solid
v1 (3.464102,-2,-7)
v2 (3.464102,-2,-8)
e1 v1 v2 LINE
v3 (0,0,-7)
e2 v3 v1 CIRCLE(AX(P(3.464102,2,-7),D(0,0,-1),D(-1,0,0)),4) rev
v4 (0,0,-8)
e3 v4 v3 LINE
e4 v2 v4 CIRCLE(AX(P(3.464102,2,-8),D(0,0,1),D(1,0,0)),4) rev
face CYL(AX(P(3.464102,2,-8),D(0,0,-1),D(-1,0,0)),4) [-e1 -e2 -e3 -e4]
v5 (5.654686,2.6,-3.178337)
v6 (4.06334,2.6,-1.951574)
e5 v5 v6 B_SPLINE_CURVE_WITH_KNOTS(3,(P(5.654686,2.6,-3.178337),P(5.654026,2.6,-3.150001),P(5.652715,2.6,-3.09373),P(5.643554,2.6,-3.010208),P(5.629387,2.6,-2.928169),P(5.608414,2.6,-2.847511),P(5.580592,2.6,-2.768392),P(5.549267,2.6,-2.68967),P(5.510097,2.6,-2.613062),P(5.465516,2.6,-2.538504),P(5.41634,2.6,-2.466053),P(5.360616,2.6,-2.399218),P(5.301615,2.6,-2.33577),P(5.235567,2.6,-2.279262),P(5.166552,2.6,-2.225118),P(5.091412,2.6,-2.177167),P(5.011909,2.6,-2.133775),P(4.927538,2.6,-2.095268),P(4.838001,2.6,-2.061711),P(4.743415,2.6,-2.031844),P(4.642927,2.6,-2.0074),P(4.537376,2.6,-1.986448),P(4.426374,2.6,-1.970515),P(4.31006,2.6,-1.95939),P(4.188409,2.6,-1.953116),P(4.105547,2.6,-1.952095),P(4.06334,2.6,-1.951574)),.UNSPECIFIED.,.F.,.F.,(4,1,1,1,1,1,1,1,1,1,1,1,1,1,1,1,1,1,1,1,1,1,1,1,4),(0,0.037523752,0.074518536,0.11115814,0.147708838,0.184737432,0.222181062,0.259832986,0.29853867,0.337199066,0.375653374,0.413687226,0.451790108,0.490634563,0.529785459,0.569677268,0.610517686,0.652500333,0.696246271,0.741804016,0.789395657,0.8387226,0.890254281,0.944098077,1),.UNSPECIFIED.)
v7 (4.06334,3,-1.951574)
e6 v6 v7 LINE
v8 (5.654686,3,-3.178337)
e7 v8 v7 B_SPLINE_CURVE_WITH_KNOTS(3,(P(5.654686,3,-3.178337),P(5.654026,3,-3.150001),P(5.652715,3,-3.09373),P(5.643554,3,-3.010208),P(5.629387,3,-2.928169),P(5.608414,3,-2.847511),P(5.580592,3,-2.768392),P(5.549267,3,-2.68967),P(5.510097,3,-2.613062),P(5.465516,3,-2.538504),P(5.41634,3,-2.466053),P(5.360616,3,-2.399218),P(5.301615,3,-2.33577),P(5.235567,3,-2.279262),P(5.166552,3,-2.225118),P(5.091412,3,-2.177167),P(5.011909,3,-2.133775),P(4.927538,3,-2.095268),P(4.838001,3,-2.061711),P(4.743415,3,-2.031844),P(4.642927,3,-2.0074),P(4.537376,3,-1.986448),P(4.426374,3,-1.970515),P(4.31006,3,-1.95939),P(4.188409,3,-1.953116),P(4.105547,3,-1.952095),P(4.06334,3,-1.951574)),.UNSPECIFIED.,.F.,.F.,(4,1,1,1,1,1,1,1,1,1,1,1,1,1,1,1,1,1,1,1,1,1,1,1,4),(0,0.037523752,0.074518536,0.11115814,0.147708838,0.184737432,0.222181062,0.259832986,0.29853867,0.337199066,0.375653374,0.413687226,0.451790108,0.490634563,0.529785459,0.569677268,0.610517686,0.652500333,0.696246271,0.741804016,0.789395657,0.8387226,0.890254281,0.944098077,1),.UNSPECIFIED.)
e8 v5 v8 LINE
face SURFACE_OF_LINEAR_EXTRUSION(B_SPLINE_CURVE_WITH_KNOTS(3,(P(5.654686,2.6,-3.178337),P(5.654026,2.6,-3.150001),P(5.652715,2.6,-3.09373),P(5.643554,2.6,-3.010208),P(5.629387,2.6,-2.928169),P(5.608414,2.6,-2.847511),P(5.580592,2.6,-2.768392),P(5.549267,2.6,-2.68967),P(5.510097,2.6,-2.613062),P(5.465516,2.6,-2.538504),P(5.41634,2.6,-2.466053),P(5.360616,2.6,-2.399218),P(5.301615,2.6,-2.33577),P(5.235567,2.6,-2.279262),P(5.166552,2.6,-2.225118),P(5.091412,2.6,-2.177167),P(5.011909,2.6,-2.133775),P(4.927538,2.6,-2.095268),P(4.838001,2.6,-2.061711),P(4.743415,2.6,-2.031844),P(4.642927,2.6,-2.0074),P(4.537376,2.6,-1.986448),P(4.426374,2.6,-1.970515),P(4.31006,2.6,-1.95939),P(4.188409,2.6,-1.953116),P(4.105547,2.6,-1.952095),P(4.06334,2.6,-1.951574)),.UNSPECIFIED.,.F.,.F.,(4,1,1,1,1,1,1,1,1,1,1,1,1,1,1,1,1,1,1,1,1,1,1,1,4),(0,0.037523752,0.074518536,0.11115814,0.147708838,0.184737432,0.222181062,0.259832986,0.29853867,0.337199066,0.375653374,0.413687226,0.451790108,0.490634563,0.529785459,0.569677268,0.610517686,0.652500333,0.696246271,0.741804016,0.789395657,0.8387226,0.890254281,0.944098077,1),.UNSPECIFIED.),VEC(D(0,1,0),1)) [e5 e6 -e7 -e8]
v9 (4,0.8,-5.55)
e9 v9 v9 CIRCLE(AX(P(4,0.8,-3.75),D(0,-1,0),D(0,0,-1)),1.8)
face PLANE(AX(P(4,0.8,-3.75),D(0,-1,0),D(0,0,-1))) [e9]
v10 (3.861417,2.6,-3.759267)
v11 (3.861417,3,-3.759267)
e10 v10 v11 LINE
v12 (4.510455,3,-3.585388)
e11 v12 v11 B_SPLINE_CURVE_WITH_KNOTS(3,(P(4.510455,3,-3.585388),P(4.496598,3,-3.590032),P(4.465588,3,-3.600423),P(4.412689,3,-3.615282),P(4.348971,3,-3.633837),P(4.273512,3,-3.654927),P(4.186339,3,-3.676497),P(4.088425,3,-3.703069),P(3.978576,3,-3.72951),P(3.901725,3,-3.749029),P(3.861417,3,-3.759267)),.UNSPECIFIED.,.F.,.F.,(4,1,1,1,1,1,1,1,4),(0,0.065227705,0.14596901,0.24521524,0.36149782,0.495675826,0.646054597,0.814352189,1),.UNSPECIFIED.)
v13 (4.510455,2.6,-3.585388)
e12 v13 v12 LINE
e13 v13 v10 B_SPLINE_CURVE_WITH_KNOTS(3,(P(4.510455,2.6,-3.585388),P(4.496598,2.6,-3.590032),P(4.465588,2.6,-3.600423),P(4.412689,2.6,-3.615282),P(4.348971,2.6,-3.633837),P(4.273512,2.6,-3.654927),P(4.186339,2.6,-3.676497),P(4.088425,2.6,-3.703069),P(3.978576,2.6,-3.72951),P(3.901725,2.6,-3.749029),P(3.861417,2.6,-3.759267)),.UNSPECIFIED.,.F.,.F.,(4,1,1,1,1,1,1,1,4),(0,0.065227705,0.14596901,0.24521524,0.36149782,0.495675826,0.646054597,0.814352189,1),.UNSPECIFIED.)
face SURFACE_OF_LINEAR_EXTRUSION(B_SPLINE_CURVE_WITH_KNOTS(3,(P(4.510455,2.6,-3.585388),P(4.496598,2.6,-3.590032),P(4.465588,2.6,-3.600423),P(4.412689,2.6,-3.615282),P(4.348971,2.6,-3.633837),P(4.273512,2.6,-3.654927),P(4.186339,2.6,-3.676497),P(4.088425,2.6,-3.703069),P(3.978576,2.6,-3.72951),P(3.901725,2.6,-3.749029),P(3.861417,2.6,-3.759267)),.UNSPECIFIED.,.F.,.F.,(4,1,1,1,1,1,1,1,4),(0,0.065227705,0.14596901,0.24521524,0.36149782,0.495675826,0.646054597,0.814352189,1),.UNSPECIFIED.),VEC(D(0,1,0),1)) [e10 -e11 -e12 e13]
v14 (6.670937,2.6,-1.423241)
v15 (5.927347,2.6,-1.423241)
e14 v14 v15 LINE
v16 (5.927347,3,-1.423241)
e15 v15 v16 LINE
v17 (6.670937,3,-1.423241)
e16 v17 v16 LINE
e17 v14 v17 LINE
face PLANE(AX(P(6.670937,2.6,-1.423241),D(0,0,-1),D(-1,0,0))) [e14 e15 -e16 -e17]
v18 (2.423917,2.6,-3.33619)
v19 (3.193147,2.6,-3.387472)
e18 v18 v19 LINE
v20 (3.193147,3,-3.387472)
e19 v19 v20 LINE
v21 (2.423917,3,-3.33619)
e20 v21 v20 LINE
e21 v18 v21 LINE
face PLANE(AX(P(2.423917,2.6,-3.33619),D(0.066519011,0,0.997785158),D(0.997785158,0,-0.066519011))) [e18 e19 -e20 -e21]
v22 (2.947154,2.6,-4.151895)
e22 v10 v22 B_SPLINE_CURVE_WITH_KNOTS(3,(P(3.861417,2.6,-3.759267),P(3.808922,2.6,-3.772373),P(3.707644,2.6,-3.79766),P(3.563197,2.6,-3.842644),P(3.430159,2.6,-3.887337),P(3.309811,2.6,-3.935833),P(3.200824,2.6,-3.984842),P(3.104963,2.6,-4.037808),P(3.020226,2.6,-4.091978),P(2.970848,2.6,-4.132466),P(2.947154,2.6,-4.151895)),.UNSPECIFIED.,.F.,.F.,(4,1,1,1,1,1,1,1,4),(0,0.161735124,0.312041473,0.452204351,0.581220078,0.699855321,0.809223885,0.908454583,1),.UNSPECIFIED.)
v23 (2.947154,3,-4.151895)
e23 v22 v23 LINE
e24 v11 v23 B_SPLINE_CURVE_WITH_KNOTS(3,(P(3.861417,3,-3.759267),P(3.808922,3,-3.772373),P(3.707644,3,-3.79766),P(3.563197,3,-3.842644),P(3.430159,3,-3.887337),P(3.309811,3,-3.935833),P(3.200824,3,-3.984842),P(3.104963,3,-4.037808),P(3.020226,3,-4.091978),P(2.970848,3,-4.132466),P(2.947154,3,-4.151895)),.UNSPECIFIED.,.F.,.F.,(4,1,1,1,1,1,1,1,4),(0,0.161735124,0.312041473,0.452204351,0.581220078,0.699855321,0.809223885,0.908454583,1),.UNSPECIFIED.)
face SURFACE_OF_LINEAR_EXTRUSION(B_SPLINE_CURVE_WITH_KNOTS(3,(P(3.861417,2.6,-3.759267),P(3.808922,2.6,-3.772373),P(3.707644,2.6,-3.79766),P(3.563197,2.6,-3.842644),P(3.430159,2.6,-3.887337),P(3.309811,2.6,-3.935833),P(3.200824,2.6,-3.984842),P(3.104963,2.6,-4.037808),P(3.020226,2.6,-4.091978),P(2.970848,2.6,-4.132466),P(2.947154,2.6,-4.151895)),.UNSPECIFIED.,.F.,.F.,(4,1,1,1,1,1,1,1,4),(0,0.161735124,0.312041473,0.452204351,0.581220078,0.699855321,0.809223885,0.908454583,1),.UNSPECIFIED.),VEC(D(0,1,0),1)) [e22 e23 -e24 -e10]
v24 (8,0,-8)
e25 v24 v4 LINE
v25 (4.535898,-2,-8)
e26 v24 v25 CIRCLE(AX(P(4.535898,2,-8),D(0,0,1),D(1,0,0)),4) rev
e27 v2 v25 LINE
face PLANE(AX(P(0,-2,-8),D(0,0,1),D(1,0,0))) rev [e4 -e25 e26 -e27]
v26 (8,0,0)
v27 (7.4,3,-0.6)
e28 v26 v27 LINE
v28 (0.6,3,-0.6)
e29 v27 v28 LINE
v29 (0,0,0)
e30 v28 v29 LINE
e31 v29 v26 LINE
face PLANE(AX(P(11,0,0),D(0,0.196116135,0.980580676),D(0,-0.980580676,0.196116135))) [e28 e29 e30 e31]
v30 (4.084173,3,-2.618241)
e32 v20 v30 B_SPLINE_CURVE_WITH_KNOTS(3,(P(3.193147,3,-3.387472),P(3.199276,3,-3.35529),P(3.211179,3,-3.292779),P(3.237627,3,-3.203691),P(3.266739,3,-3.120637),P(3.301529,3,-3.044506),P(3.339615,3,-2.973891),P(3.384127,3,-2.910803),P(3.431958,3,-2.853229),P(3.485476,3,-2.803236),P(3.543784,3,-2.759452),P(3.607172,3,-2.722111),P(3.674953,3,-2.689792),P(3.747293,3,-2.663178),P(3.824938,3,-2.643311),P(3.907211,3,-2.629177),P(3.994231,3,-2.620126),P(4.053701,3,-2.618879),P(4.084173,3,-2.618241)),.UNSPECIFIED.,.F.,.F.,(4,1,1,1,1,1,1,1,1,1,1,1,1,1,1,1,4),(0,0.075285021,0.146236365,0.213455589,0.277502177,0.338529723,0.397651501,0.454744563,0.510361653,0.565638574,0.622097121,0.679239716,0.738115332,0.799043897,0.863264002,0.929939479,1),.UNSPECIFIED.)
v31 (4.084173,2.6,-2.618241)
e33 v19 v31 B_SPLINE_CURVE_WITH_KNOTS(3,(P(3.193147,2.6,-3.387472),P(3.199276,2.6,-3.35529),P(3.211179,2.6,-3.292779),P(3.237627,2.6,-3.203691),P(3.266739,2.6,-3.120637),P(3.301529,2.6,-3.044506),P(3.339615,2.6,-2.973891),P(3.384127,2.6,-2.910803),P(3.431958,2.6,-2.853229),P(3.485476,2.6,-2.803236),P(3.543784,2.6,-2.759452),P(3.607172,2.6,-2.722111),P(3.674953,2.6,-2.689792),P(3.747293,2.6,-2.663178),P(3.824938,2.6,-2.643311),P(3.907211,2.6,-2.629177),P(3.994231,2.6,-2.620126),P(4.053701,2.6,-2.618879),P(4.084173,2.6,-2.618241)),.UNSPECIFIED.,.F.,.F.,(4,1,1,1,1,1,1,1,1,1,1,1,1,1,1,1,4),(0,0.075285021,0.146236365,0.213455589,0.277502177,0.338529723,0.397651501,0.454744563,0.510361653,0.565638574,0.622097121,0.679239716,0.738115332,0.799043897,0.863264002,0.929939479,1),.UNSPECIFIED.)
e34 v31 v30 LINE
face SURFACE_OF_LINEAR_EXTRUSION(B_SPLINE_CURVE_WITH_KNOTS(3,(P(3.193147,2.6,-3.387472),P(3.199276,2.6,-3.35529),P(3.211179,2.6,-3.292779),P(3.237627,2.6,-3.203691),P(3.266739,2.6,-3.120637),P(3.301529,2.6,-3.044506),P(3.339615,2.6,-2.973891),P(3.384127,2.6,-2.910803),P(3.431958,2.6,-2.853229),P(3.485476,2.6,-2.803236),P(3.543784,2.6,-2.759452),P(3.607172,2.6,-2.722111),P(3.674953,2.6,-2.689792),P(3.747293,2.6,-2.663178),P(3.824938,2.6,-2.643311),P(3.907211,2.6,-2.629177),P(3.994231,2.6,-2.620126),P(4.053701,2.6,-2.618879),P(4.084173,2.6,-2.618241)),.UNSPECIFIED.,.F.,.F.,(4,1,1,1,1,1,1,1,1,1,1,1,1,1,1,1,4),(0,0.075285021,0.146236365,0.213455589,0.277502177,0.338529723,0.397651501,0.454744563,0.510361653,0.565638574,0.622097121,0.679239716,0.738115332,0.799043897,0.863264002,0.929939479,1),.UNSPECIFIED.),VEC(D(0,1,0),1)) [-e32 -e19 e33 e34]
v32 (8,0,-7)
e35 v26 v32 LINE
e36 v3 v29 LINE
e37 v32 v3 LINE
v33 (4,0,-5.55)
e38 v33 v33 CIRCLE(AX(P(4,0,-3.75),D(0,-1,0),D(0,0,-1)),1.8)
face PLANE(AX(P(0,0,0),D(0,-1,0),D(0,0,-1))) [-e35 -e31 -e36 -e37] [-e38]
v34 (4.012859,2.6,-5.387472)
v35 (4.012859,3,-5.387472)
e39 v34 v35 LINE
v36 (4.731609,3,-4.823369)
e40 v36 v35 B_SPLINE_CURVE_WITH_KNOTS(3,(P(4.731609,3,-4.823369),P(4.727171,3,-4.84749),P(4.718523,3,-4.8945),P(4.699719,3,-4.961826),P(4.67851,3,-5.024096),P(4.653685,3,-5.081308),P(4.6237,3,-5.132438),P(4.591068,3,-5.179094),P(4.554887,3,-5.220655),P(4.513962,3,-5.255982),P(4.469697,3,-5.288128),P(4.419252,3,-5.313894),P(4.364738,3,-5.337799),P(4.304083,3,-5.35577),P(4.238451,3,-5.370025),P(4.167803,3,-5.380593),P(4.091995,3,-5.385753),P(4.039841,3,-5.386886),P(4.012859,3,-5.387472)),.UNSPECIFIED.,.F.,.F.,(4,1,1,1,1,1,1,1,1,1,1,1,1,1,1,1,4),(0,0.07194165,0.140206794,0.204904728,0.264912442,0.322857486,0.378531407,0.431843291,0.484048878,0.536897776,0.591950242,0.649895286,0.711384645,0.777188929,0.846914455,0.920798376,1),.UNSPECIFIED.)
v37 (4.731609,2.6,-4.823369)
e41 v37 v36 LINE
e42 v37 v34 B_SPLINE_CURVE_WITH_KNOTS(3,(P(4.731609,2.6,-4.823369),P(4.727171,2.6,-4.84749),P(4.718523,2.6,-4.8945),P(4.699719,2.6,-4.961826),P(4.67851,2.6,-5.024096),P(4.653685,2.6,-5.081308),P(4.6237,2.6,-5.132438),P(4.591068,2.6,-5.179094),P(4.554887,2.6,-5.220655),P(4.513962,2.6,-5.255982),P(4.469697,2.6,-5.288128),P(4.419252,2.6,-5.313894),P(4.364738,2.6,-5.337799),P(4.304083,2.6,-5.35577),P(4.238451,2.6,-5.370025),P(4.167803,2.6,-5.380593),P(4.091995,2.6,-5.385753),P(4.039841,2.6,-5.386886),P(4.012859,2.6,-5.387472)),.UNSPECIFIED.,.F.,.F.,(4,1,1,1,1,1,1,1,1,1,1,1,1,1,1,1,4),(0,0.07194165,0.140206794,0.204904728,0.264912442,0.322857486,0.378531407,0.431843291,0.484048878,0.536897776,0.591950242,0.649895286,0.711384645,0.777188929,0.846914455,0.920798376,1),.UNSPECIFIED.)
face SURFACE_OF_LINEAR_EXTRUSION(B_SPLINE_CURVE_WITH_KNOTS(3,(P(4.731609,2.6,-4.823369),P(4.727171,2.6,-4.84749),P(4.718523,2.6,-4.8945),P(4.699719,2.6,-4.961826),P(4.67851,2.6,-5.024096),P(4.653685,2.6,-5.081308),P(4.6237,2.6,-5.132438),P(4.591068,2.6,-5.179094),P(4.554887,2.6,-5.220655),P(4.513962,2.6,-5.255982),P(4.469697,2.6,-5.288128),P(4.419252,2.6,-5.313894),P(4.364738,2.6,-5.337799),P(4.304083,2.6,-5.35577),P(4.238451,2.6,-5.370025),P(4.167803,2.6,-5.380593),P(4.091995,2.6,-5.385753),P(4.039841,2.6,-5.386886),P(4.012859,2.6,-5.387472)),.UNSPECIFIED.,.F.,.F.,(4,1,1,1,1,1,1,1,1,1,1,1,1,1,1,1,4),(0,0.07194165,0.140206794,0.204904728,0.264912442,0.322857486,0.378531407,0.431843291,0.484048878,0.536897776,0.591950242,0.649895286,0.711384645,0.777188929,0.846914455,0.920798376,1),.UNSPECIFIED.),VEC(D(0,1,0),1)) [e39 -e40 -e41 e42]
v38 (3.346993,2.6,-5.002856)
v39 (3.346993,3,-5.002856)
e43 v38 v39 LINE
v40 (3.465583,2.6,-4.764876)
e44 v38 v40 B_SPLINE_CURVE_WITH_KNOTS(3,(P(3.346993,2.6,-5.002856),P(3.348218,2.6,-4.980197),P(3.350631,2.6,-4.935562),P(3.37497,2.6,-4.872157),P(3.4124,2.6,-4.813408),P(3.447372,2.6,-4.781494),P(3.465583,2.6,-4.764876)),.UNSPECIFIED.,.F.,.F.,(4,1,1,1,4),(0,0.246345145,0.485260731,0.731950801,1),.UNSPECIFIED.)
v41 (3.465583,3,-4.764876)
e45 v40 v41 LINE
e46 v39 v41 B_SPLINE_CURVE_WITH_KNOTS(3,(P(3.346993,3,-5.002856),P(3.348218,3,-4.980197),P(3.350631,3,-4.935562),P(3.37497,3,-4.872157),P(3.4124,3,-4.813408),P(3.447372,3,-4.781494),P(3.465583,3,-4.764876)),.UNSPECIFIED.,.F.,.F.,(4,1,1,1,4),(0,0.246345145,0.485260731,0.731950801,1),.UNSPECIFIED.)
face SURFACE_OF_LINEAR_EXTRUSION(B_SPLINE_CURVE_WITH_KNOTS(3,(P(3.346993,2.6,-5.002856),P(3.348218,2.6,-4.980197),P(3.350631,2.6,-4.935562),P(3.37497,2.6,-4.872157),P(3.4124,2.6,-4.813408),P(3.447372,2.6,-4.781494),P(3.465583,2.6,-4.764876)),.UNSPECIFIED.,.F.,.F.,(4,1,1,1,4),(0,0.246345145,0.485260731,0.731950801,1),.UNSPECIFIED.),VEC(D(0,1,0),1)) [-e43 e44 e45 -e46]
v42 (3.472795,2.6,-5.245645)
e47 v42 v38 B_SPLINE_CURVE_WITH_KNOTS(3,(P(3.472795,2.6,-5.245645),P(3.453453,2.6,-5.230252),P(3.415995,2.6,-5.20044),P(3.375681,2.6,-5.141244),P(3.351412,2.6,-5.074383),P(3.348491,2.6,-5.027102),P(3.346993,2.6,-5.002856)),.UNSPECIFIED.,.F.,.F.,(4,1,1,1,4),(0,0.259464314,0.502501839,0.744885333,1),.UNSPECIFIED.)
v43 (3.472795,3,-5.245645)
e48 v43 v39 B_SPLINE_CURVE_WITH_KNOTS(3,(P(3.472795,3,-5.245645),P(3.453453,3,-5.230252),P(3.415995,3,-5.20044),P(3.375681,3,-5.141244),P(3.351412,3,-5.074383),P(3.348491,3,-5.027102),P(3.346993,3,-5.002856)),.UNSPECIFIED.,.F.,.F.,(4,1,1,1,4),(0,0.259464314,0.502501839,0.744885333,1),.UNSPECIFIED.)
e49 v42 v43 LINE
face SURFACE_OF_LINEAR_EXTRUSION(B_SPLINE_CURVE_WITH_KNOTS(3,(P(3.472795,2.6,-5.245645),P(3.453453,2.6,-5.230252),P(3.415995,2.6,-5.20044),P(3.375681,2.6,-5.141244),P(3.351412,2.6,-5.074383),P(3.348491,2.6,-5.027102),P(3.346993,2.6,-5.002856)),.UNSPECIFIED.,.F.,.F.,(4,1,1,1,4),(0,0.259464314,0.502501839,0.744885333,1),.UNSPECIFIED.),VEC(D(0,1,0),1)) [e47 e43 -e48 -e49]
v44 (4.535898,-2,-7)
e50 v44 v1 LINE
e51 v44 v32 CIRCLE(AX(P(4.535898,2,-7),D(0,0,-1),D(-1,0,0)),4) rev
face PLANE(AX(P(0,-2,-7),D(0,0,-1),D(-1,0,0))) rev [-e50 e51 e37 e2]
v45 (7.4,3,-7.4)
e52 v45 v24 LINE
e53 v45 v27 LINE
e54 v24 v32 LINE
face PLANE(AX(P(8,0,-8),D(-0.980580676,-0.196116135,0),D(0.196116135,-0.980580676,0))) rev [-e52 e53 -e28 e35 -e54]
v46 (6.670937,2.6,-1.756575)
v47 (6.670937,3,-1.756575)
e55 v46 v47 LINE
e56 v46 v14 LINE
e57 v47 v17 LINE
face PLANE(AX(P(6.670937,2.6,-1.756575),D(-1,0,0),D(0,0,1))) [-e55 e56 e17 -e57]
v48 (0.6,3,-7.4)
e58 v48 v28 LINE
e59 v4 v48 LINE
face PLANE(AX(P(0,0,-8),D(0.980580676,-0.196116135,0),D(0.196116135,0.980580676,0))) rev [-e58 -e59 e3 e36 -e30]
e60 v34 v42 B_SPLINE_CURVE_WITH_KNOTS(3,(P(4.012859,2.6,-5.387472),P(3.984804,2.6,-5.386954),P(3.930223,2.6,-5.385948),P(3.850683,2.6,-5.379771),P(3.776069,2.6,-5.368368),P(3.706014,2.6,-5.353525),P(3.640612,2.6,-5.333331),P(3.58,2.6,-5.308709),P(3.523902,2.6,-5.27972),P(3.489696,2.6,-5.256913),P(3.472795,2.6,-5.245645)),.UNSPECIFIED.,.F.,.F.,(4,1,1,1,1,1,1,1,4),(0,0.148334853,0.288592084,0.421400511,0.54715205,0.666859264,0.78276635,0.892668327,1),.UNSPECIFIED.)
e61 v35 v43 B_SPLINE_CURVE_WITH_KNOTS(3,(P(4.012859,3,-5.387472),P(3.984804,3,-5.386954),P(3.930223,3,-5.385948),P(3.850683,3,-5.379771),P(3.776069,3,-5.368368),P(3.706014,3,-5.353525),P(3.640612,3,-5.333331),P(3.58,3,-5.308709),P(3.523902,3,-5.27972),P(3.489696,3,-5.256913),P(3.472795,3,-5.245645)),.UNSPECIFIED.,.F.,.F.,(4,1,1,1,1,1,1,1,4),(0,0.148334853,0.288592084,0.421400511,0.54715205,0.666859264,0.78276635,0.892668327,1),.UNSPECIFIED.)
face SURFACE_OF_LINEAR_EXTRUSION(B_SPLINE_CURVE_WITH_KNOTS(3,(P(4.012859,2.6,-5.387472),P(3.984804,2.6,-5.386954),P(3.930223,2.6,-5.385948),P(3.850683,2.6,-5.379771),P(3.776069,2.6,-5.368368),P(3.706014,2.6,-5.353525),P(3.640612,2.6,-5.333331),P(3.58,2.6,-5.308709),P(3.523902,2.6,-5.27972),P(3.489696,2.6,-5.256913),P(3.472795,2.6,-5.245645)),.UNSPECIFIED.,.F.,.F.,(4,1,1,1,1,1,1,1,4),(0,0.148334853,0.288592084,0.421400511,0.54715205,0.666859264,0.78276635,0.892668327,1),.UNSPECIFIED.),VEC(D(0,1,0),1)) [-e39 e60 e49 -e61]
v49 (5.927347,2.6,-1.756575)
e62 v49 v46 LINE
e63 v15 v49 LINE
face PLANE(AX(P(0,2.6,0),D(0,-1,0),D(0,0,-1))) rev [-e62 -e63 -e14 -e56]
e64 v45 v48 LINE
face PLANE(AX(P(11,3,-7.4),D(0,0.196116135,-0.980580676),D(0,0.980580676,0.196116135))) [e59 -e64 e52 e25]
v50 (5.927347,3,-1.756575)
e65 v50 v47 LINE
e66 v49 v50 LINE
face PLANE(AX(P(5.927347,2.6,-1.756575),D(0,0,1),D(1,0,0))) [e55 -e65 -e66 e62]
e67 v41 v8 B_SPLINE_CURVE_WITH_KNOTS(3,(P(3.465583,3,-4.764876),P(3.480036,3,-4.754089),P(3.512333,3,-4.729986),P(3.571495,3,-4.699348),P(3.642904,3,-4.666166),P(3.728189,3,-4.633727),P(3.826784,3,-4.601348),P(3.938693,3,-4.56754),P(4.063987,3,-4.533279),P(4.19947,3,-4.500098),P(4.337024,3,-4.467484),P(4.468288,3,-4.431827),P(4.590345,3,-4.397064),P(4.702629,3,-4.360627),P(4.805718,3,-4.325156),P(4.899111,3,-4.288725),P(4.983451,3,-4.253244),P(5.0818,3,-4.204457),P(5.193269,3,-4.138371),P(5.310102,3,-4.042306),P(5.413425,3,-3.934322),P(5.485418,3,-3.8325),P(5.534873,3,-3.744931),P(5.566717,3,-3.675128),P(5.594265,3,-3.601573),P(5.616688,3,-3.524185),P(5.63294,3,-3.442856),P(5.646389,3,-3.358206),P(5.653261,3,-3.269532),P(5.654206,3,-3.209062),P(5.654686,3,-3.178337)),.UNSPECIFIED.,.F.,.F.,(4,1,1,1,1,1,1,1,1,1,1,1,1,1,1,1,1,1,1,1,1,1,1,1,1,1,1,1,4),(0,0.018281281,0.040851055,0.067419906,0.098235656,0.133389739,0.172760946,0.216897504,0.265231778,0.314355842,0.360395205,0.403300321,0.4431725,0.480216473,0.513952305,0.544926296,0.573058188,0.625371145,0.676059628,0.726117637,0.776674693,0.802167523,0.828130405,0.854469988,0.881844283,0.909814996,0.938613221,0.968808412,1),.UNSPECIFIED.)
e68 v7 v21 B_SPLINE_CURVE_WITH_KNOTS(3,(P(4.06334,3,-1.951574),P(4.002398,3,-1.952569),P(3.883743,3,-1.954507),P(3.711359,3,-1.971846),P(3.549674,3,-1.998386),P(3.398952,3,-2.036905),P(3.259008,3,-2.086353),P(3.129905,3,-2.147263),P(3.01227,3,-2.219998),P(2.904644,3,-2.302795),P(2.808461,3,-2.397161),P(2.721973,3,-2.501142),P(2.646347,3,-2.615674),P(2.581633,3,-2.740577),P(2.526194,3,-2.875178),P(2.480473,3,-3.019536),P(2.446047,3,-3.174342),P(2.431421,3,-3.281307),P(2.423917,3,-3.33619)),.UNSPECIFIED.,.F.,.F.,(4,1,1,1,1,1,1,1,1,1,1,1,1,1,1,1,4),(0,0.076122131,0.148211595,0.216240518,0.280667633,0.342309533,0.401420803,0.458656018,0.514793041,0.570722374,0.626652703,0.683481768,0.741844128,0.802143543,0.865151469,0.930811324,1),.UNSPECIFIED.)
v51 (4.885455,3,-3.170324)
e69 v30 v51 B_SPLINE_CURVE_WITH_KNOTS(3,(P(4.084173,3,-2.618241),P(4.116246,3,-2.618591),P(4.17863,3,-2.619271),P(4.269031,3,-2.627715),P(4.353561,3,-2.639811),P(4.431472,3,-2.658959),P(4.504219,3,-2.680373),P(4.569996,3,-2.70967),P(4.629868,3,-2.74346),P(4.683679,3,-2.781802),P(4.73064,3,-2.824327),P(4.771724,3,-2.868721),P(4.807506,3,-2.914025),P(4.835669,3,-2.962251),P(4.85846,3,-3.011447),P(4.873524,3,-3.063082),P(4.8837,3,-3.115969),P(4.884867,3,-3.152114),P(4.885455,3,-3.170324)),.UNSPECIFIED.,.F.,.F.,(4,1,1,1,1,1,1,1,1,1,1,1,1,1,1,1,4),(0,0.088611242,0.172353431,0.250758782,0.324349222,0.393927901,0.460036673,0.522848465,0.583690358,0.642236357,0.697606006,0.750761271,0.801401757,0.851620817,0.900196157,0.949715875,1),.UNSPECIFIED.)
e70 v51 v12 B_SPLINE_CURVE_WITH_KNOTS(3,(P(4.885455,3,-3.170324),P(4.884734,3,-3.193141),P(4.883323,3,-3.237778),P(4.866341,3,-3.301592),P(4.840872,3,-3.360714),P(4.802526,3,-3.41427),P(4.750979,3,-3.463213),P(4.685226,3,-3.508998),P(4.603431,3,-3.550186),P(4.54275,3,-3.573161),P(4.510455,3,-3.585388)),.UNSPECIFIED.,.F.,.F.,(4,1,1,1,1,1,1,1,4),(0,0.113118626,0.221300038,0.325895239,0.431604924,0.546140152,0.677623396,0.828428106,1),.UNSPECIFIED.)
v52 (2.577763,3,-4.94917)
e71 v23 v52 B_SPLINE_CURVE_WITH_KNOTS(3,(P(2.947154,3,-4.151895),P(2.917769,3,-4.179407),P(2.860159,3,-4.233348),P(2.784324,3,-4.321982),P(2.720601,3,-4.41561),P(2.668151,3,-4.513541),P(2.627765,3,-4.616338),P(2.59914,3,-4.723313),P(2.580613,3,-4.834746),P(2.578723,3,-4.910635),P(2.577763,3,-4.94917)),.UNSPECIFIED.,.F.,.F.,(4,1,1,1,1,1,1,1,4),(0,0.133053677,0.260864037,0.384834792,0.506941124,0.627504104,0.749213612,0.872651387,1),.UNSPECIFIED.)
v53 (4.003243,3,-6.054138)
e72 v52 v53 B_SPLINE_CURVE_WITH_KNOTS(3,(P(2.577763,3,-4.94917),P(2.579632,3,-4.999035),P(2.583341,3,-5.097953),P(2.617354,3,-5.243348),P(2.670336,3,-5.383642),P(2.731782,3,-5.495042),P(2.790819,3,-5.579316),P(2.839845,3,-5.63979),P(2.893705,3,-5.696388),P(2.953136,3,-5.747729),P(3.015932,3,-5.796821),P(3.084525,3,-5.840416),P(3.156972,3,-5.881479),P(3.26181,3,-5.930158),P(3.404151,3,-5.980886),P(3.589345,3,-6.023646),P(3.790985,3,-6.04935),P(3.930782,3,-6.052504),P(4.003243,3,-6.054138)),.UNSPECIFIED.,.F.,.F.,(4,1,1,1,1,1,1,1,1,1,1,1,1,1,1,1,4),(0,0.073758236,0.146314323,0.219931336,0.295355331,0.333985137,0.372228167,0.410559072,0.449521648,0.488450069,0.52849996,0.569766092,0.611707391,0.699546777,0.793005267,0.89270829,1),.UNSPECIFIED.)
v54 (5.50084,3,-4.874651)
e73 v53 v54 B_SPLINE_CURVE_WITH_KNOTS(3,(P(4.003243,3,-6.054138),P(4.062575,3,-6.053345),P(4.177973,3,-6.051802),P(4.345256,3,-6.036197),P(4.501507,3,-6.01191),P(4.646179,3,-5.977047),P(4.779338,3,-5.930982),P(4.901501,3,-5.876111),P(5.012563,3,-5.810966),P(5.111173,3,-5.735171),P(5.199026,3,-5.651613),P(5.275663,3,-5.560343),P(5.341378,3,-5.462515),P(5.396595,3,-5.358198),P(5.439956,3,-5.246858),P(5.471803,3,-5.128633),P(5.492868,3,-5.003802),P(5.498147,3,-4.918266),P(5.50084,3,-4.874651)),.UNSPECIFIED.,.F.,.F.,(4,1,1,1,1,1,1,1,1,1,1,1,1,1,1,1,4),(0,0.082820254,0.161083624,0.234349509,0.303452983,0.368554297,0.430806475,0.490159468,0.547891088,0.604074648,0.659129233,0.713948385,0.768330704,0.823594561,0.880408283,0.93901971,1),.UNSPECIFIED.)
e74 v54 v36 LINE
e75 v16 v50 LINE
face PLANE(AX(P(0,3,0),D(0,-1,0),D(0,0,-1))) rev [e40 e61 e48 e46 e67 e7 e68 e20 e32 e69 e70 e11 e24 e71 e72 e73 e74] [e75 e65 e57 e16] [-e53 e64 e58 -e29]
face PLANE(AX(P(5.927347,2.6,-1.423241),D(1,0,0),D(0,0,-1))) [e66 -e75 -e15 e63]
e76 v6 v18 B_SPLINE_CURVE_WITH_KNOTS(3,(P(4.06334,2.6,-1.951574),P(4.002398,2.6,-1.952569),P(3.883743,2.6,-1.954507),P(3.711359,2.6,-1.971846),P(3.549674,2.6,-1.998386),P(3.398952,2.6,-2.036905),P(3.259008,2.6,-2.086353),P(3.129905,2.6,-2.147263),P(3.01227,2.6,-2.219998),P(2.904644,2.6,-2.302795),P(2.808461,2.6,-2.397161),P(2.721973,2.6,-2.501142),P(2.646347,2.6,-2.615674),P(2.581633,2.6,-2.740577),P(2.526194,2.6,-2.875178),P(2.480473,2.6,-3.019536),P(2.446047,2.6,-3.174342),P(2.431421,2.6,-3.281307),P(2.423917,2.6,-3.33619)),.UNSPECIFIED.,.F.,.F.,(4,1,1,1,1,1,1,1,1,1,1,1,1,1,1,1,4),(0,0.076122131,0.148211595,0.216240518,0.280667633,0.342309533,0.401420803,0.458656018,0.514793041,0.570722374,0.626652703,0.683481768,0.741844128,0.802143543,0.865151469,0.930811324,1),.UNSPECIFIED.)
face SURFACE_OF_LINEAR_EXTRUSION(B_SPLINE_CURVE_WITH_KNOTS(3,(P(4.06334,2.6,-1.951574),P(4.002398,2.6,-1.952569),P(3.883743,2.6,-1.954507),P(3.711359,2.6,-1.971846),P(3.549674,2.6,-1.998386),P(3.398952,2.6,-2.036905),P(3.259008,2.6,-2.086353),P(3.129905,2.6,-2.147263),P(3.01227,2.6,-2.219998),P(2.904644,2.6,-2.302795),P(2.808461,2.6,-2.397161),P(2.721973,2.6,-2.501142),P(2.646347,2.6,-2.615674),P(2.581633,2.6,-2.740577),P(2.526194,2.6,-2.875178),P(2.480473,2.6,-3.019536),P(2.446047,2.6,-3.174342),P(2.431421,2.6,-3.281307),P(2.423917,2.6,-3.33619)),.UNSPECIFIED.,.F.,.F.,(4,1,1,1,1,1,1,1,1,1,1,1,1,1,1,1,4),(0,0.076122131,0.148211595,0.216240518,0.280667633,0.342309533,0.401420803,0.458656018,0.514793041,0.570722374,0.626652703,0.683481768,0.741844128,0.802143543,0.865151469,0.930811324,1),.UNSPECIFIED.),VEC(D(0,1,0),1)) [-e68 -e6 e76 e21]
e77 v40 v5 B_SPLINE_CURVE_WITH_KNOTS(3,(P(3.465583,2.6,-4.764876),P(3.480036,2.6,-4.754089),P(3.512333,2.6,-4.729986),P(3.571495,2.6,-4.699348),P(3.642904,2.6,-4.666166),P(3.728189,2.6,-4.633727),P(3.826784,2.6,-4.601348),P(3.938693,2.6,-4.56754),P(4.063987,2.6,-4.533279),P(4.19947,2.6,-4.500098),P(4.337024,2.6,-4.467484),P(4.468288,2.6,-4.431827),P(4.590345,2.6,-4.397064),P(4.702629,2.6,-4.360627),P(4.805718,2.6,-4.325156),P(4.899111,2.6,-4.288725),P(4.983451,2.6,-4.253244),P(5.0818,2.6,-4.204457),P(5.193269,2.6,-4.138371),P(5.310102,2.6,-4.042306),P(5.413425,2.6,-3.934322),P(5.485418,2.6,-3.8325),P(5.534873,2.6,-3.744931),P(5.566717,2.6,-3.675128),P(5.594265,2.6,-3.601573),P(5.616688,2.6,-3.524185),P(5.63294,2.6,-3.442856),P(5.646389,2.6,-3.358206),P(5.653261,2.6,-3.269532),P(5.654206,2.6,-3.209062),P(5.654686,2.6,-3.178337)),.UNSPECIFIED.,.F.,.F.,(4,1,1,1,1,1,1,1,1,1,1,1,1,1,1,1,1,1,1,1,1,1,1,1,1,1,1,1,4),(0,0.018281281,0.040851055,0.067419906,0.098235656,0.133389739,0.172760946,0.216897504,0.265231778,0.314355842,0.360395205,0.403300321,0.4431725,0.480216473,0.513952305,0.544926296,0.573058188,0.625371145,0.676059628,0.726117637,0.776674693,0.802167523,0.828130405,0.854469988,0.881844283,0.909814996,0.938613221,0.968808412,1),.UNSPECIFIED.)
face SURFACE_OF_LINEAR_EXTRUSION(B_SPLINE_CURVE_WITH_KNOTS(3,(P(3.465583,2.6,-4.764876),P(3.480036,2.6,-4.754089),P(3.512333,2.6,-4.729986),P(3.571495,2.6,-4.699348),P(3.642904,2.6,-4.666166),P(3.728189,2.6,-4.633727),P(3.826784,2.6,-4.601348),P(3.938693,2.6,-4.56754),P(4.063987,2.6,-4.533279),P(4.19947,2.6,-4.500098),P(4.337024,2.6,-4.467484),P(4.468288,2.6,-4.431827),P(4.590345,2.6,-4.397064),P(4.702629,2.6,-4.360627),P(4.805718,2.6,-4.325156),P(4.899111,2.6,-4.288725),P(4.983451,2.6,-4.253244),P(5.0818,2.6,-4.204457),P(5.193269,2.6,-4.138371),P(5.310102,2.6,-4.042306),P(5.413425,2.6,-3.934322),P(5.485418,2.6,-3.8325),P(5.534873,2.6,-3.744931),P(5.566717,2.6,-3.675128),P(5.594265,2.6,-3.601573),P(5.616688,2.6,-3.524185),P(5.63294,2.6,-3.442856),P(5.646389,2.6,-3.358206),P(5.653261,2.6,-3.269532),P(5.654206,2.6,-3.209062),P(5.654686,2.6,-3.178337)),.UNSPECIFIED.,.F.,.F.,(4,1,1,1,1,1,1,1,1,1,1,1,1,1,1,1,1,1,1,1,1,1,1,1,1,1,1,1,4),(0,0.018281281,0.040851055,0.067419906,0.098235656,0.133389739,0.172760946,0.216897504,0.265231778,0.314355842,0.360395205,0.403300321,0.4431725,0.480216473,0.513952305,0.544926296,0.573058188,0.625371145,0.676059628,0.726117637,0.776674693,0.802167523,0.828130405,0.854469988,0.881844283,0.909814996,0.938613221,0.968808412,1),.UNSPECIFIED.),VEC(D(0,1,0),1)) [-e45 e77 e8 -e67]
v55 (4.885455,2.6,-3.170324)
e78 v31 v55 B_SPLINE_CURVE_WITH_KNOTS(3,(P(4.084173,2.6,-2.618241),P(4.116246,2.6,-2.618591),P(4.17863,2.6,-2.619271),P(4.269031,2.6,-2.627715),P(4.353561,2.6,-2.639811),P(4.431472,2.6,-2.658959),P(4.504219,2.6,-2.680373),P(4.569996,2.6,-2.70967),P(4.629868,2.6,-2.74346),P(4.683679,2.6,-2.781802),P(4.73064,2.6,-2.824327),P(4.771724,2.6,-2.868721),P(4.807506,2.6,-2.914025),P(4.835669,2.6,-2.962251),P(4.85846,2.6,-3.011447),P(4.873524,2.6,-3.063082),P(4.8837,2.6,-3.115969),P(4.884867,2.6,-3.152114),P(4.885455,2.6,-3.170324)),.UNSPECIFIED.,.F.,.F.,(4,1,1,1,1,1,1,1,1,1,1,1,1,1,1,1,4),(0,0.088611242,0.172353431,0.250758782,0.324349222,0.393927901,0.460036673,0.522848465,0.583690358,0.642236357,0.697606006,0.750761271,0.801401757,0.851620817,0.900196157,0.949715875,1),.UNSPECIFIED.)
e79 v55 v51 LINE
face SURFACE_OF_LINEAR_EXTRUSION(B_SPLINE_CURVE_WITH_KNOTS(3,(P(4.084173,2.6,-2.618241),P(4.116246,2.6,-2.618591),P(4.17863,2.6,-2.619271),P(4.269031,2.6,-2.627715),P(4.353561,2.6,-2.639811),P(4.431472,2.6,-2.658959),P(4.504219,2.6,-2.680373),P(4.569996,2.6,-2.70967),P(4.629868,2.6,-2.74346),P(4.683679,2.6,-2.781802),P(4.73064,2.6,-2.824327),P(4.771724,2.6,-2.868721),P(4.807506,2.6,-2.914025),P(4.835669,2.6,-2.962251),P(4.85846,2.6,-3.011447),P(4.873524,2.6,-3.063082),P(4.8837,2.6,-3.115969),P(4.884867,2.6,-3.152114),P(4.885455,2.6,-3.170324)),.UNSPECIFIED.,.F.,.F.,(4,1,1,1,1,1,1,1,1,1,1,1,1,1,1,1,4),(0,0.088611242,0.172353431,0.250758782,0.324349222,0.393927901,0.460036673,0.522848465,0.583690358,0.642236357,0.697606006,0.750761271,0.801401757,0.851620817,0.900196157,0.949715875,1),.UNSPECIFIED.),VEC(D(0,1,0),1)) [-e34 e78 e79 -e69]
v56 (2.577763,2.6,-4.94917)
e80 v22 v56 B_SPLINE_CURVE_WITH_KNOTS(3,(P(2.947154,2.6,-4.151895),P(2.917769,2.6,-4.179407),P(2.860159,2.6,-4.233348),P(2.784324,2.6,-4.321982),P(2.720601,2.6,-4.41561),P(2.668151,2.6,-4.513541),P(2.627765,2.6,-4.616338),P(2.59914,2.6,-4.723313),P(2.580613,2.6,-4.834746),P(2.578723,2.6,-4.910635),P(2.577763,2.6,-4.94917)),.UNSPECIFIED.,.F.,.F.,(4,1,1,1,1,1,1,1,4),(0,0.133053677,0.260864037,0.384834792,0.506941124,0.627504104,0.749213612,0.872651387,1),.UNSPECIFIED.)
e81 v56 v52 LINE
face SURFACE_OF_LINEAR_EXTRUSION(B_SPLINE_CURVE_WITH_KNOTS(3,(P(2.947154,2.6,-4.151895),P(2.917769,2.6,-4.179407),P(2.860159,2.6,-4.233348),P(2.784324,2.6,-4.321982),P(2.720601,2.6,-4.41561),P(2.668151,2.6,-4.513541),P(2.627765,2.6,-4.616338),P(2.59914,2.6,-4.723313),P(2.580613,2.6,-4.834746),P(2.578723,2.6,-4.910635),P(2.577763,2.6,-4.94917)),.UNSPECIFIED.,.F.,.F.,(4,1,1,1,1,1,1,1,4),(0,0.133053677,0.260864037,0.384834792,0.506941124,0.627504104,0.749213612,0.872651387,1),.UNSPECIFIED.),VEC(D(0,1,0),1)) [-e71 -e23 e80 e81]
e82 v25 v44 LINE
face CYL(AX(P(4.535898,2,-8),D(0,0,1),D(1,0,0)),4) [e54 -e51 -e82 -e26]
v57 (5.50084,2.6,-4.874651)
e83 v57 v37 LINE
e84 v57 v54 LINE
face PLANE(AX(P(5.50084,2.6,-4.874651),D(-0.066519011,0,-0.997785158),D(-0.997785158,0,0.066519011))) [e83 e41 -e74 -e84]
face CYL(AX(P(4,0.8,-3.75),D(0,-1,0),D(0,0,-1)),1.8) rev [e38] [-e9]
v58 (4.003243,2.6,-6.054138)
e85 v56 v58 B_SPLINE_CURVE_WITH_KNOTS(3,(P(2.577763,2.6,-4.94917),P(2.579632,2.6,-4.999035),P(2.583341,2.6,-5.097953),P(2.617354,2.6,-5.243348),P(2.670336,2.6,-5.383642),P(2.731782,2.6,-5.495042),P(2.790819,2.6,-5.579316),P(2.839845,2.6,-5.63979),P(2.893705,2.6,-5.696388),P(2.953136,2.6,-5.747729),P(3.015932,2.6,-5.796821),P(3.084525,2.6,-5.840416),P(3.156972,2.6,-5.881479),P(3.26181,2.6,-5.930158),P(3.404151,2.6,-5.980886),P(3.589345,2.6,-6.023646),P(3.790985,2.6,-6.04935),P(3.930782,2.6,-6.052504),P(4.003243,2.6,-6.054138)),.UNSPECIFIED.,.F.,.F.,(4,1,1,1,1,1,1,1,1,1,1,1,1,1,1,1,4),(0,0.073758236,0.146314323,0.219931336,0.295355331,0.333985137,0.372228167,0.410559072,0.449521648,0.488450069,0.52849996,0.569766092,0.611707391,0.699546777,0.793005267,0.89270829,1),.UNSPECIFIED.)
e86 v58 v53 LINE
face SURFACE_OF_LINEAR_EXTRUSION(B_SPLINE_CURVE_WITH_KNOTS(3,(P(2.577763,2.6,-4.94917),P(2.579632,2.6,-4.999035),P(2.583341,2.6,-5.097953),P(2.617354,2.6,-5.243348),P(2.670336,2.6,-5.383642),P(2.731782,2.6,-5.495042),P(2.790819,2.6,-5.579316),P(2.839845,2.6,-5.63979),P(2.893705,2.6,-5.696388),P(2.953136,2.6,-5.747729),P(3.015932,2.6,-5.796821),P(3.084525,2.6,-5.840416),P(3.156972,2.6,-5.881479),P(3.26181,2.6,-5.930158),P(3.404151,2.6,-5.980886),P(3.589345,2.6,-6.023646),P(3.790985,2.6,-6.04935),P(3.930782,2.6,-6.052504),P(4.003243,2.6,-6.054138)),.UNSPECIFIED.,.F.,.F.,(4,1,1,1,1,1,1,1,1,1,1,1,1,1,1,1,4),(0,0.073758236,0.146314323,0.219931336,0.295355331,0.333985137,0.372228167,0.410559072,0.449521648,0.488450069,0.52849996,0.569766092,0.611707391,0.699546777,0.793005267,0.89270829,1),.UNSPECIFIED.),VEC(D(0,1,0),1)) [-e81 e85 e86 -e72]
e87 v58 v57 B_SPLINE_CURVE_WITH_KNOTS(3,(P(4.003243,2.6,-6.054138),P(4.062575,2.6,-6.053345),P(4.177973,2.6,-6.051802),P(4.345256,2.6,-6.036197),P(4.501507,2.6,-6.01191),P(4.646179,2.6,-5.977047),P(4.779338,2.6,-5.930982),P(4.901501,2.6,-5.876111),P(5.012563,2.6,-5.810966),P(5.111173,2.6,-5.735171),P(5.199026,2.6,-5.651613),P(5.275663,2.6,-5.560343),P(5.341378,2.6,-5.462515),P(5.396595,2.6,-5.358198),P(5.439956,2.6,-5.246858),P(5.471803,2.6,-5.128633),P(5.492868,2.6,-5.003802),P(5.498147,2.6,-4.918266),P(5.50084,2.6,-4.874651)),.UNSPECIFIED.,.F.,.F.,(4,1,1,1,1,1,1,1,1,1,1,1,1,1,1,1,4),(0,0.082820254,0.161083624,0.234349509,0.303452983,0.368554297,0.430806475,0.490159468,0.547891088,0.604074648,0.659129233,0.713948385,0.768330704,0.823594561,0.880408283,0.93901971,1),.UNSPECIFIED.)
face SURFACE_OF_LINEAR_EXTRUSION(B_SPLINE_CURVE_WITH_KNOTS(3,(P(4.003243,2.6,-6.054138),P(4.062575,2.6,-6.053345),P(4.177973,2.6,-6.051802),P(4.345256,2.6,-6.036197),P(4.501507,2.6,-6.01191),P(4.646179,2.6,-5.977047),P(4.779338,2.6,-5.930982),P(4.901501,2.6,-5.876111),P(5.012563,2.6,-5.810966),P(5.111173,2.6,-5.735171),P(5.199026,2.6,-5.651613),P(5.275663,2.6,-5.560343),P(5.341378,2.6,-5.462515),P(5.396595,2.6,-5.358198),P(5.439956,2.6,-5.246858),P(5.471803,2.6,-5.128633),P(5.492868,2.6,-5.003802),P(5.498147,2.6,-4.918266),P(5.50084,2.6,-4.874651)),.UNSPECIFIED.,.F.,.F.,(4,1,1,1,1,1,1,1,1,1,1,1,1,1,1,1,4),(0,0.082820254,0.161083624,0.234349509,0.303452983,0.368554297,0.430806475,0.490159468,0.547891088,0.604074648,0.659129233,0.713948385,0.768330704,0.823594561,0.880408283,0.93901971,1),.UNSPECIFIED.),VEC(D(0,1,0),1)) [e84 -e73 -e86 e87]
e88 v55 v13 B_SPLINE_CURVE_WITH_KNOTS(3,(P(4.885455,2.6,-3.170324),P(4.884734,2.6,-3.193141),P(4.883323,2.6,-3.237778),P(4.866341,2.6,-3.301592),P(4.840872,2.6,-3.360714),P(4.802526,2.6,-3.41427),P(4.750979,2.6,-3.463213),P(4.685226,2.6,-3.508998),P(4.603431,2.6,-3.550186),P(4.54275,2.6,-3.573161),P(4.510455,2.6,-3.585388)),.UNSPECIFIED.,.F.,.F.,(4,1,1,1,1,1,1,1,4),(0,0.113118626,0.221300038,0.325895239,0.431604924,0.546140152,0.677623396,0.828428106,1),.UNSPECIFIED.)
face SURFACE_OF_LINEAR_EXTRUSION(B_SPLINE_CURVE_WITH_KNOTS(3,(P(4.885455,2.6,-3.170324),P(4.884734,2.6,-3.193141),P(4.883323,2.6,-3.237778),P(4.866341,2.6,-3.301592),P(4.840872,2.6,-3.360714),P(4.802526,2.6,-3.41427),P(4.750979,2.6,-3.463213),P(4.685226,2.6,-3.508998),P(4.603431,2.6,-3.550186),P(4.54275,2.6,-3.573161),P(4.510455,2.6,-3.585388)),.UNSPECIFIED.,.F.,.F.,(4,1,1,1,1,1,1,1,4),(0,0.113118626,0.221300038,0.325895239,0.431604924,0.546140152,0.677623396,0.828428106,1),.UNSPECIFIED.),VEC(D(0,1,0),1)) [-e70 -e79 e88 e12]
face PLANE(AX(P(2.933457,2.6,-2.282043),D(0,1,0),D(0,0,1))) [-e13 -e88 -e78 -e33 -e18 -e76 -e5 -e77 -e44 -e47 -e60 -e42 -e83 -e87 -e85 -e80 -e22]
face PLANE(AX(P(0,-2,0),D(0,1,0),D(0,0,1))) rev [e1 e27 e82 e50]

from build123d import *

# Parameters (mm, degrees)
SKETCH1_W               = 8
SKETCH1_H               = 8
BOSS_EXTRUDE1_DEPTH     = 3
CUT_EXTRUDE1_DEPTH      = 12.704699911
CUT_EXTRUDE1_DEPTH_BACK = 12.704699911
CUT_EXTRUDE2_DEPTH      = 11
SKETCH4_R               = 1.8
CUT_EXTRUDE3_DEPTH      = 0.8
SKETCH5_W               = 8
SKETCH5_H               = 1
BOSS_EXTRUDE2_DEPTH     = 2
FILLET1_R               = 4
CUT_EXTRUDE4_DEPTH      = 0.4
SKETCH7_W               = 0.743589743
SKETCH7_H               = 0.333333333
CUT_EXTRUDE5_DEPTH      = 0.4


with BuildPart() as part:
    # Sketch1 → Boss-Extrude1 (new body)
    with BuildSketch(Plane(origin=(0, 0, 0), x_dir=(1, 0, 0), z_dir=(0, 1, 0))):
        with Locations((4, 4)):
            Rectangle(SKETCH1_W, SKETCH1_H)
    extrude(amount=BOSS_EXTRUDE1_DEPTH)

    # Sketch2 → Cut-Extrude1 (cut, two sides: drawn at the far end of the back side and taken through both)
    with BuildSketch(Plane.XY.offset(-CUT_EXTRUDE1_DEPTH_BACK)):
        Polygon((0, 0), (0.6, 3), (0, 3), align=None)
        Polygon((8, 0), (7.4, 3), (8, 3), align=None)
    extrude(amount=CUT_EXTRUDE1_DEPTH + CUT_EXTRUDE1_DEPTH_BACK, mode=Mode.SUBTRACT)

    # Sketch3 → Cut-Extrude2 (cut)
    with BuildSketch(Plane(origin=(0, 0, 0), x_dir=(0, 0, -1), z_dir=(1, 0, 0))):
        Polygon((0, 0), (0.6, 3), (0, 3), align=None)
        Polygon((8, 3), (7.4, 3), (8, 0), align=None)
    extrude(amount=CUT_EXTRUDE2_DEPTH, mode=Mode.SUBTRACT)

    # Sketch4 → Cut-Extrude3 (cut)
    with BuildSketch(Plane.XZ):
        with Locations(Location((4, -3.75, 0), (0, 0, 270))):
            Circle(SKETCH4_R)
    extrude(amount=-CUT_EXTRUDE3_DEPTH, mode=Mode.SUBTRACT)

    # Sketch5 → Boss-Extrude2 (add)
    with BuildSketch(Plane.XZ):
        with Locations((4, -7.5)):
            Rectangle(SKETCH5_W, SKETCH5_H)
    extrude(amount=BOSS_EXTRUDE2_DEPTH)

    # Fillet1
    # the kernel refuses this fillet: 4 mm, written as the material it takes off along each edge
    with BuildSketch(Plane(origin=(8, -2, -16.660254038), x_dir=(0, 1, 0), z_dir=(0, 0, 1)), Plane(origin=(0, -2, 1.660254038), x_dir=(0, 1, 0), z_dir=(0, 0, -1))) as fillet1_piece_1:
        with BuildLine():
            CenterArc((4, 3.464101615), FILLET1_R, 180, 60)
            Line((0, 3.464101615), (-0.08, 3.464101615))
            Line((-0.08, 3.464101615), (-0.08, 0))
            Line((-0.08, 0), (0, -0.08))
            ThreePointArc((0, -0.08), (1, -0.08), (1.96, -0.069282032))
            Line((1.96, -0.069282032), (2, 0))
        make_face()
    extrude(amount=18.320508076, mode=Mode.SUBTRACT)

    # Sketch6 → Cut-Extrude4 (cut)
    with BuildSketch(Plane(origin=(0, 3, 0), x_dir=(1, 0, 0), z_dir=(0, 1, 0))):
        with BuildLine():
            Line((2.423916505, 3.336189685), (3.193147274, 3.387471736))
            add(Edge.make_bspline(
                [(3.193147274, 3.387471736), (3.199275518, 3.35528983), (3.211179242, 3.292778523), (3.237627081, 3.203691377), (3.266738832, 3.12063689), (3.30152897, 3.044505684), (3.339615284, 2.973890515), (3.38412658, 2.910803039), (3.431957638, 2.853229033), (3.485476185, 2.803236311), (3.543783948, 2.759451994), (3.607171876, 2.722111271), (3.674953108, 2.6897922), (3.747293374, 2.663178469), (3.824938253, 2.64331119), (3.907211345, 2.629176798), (3.994230643, 2.620125524), (4.053701404, 2.618879435), (4.084172915, 2.618240967)],
                knots=[0, 0, 0, 0, 1.204560339, 2.339781841, 3.415289417, 4.440034832, 5.416475564, 6.362424008, 7.275913008, 8.16578645, 9.05021719, 9.95355393, 10.867835453, 11.809845306, 12.784702352, 13.812224031, 14.87903166, 16, 16, 16, 16], degree=3))
            add(Edge.make_bspline(
                [(4.084172915, 2.618240967), (4.116246108, 2.618590883), (4.178630121, 2.619271489), (4.269031453, 2.627715), (4.353560804, 2.639811238), (4.431471751, 2.6589593), (4.504219207, 2.680373377), (4.569996427, 2.709670116), (4.629867843, 2.743459668), (4.683679212, 2.781802056), (4.730640445, 2.824326515), (4.771724475, 2.86872067), (4.807505951, 2.914025405), (4.835668504, 2.962251146), (4.858460082, 3.011447443), (4.873523718, 3.063081907), (4.883700097, 3.1159689), (4.884867031, 3.152113555), (4.885454967, 3.1703243)],
                knots=[0, 0, 0, 0, 1.417779877, 2.757654889, 4.012140507, 5.189587551, 6.302846416, 7.360586765, 8.365575446, 9.33904572, 10.275781718, 11.161696098, 12.012180333, 12.822428111, 13.625933072, 14.403138519, 15.195454004, 16, 16, 16, 16], degree=3))
            add(Edge.make_bspline(
                [(4.885454967, 3.1703243), (4.884733913, 3.193140887), (4.883323278, 3.237778199), (4.866340641, 3.301592127), (4.840872442, 3.360713887), (4.802526135, 3.41427025), (4.750979261, 3.463212961), (4.685226085, 3.508997669), (4.603431212, 3.550186), (4.542750055, 3.573160928), (4.510454967, 3.585388403)],
                knots=[0, 0, 0, 0, 0.90494901, 1.770400303, 2.607161909, 3.452839393, 4.36912122, 5.420987164, 6.627424851, 8, 8, 8, 8], degree=3))
            add(Edge.make_bspline(
                [(4.510454967, 3.585388403), (4.496597999, 3.590031937), (4.465588357, 3.600423411), (4.4126892, 3.615282239), (4.348970759, 3.633836968), (4.273512264, 3.654927379), (4.186339087, 3.676497317), (4.088424838, 3.703069034), (3.978575834, 3.729510064), (3.901725338, 3.749028827), (3.861416505, 3.759266608)],
                knots=[0, 0, 0, 0, 0.521821638, 1.167752076, 1.961721917, 2.891982557, 3.96540661, 5.168436773, 6.514817513, 8, 8, 8, 8], degree=3))
            add(Edge.make_bspline(
                [(3.861416505, 3.759266608), (3.808922441, 3.772373151), (3.707643728, 3.797660082), (3.563197092, 3.84264374), (3.430159098, 3.887337495), (3.309810688, 3.935832618), (3.200824367, 3.984842463), (3.104963023, 4.037807847), (3.02022624, 4.091978089), (2.970848149, 4.132466251), (2.947153685, 4.151894813)],
                knots=[0, 0, 0, 0, 1.293880989, 2.496331788, 3.617634808, 4.64976062, 5.598842568, 6.473791081, 7.267636666, 8, 8, 8, 8], degree=3))
            add(Edge.make_bspline(
                [(2.947153685, 4.151894813), (2.917769469, 4.179407128), (2.860158996, 4.233347566), (2.784323751, 4.321982057), (2.720601495, 4.415610216), (2.668151102, 4.513540942), (2.627765291, 4.616338017), (2.599140348, 4.723313361), (2.580613245, 4.834746169), (2.578722682, 4.91063455), (2.577762659, 4.949170454)],
                knots=[0, 0, 0, 0, 1.064429417, 2.086912298, 3.078678339, 4.055528992, 5.020032834, 5.993708893, 6.981211098, 8, 8, 8, 8], degree=3))
            add(Edge.make_bspline(
                [(2.577762659, 4.949170454), (2.579632311, 4.999035454), (2.583341142, 5.097952729), (2.617353538, 5.24334762), (2.670335558, 5.383642492), (2.731782138, 5.495041815), (2.790819043, 5.579315825), (2.839844896, 5.639790083), (2.893704531, 5.696388175), (2.953135712, 5.747729494), (3.015931612, 5.796821395), (3.084525186, 5.840415592), (3.156971597, 5.881478913), (3.261809808, 5.93015757), (3.404151332, 5.980885512), (3.589345301, 6.023645948), (3.790984862, 6.049350493), (3.930782191, 6.052503897), (4.003243428, 6.054138403)],
                knots=[0, 0, 0, 0, 1.180131776, 2.341029169, 3.518901375, 4.725685298, 5.343762192, 5.955650671, 6.568945152, 7.192346361, 7.815201106, 8.455999361, 9.116257477, 9.787318263, 11.192748436, 12.688084276, 14.283332633, 16, 16, 16, 16], degree=3))
            add(Edge.make_bspline(
                [(4.003243428, 6.054138403), (4.062574751, 6.053344994), (4.177972905, 6.051801831), (4.345255933, 6.036197125), (4.501507358, 6.011910245), (4.646178875, 5.977046542), (4.779337891, 5.930982439), (4.901500568, 5.876111383), (5.012563098, 5.81096567), (5.111173405, 5.735171454), (5.199025737, 5.651613191), (5.275662846, 5.560343317), (5.341377732, 5.462514514), (5.396594511, 5.358198276), (5.439956101, 5.246858263), (5.471803478, 5.128633406), (5.492867609, 5.003801978), (5.498147397, 4.918266237), (5.500839582, 4.874651223)],
                knots=[0, 0, 0, 0, 1.325124071, 2.577337985, 3.749592149, 4.855247722, 5.896868755, 6.892903601, 7.842551483, 8.766257401, 9.665194363, 10.546067736, 11.423174165, 12.293291263, 13.177512979, 14.086532529, 15.024315359, 16, 16, 16, 16], degree=3))
            Line((5.500839582, 4.874651223), (4.731608813, 4.823369172))
            add(Edge.make_bspline(
                [(4.731608813, 4.823369172), (4.727171315, 4.847490186), (4.718523093, 4.894499533), (4.699719489, 4.96182647), (4.678509937, 5.024096207), (4.653685255, 5.081308344), (4.623700039, 5.13243816), (4.591067506, 5.179094223), (4.554887475, 5.220654869), (4.51396201, 5.255982033), (4.469697485, 5.288128305), (4.419251527, 5.313894286), (4.364737876, 5.337799444), (4.30408262, 5.355770261), (4.238450559, 5.370025359), (4.167803464, 5.380593162), (4.091994892, 5.385752959), (4.039841388, 5.386885694), (4.012858813, 5.387471736)],
                knots=[0, 0, 0, 0, 1.151066407, 2.24330871, 3.278475654, 4.238599069, 5.165719782, 6.056502506, 6.909492653, 7.744782051, 8.590364415, 9.471203867, 10.39832458, 11.382154319, 12.435022857, 13.550631277, 14.73277401, 16, 16, 16, 16], degree=3))
            add(Edge.make_bspline(
                [(4.012858813, 5.387471736), (3.984804304, 5.386954358), (3.930223002, 5.385947775), (3.850683499, 5.379770524), (3.776069477, 5.368367912), (3.706014485, 5.353524542), (3.640612102, 5.333331162), (3.580000346, 5.308708643), (3.523901913, 5.279720359), (3.489695535, 5.256913378), (3.47279471, 5.245644813)],
                knots=[0, 0, 0, 0, 1.186678824, 2.308736671, 3.37120409, 4.377216403, 5.334874112, 6.262130804, 7.141346615, 8, 8, 8, 8], degree=3))
            add(Edge.make_bspline(
                [(3.47279471, 5.245644813), (3.453453136, 5.230251633), (3.415994509, 5.200439822), (3.3756811, 5.141243702), (3.351412335, 5.074383458), (3.348491314, 5.027102037), (3.346993428, 5.002856352)],
                knots=[0, 0, 0, 0, 1.037857257, 2.010007357, 2.979541333, 4, 4, 4, 4], degree=3))
            add(Edge.make_bspline(
                [(3.346993428, 5.002856352), (3.348218426, 4.980197149), (3.350631475, 4.935562125), (3.374970191, 4.872157107), (3.41239982, 4.813407798), (3.447371668, 4.781494404), (3.465583172, 4.764875582)],
                knots=[0, 0, 0, 0, 0.98538058, 1.941042925, 2.927803204, 4, 4, 4, 4], degree=3))
            add(Edge.make_bspline(
                [(3.465583172, 4.764875582), (3.480036346, 4.754089134), (3.512333176, 4.72998591), (3.571494566, 4.699348433), (3.642903916, 4.666166195), (3.728189187, 4.633726893), (3.826783574, 4.601347807), (3.938693075, 4.567540299), (4.063986517, 4.533278892), (4.199470233, 4.500098399), (4.337024364, 4.467483879), (4.46828848, 4.431827004), (4.590345232, 4.397064309), (4.702628677, 4.360627363), (4.805717615, 4.325156109), (4.899111277, 4.288724577), (4.98345094, 4.253244341), (5.081800337, 4.204456503), (5.193269487, 4.138371404), (5.310101731, 4.042305693), (5.413424942, 3.934321559), (5.485417809, 3.83249997), (5.534873142, 3.744930694), (5.566717158, 3.675127784), (5.59426473, 3.601573118), (5.616688379, 3.524185412), (5.632940128, 3.442855773), (5.646389397, 3.358205559), (5.653260877, 3.269531733), (5.654205671, 3.209062493), (5.654685736, 3.178337121)],
                knots=[0, 0, 0, 0, 0.511875881, 1.143829537, 1.88775736, 2.750598373, 3.734912702, 4.837306479, 6.073130119, 7.42648979, 8.801963576, 10.091065733, 11.292408984, 12.408830014, 13.446061236, 14.39066453, 15.257936293, 16.045629259, 17.510392066, 18.929669597, 20.331293837, 21.746891395, 22.460690638, 23.187651344, 23.925159671, 24.69163991, 25.474819891, 26.281170188, 27.126635539, 28, 28, 28, 28], degree=3))
            add(Edge.make_bspline(
                [(5.654685736, 3.178337121), (5.654025632, 3.150001459), (5.652714728, 3.093729578), (5.643553782, 3.010207902), (5.629386607, 2.928169417), (5.608414322, 2.847511277), (5.580592445, 2.768392154), (5.549267222, 2.689670139), (5.510096795, 2.613061996), (5.465515506, 2.538504273), (5.41634032, 2.466052922), (5.360615699, 2.3992182), (5.301614691, 2.335770341), (5.235567289, 2.279262071), (5.166552067, 2.225117883), (5.091412341, 2.177166881), (5.011908526, 2.133775469), (4.927537931, 2.095267608), (4.838001417, 2.061711489), (4.743415274, 2.031844209), (4.642927337, 2.007400135), (4.537375532, 1.986448484), (4.426373586, 1.970515295), (4.310060277, 1.959390224), (4.188409162, 1.953116354), (4.105547428, 1.952094705), (4.063339582, 1.9515743)],
                knots=[0, 0, 0, 0, 0.900570041, 1.788444861, 2.667795364, 3.545012114, 4.433698372, 5.332345486, 6.235991676, 7.164928091, 8.092777575, 9.015680987, 9.928493428, 10.842962589, 11.775229507, 12.714851019, 13.672254427, 14.652424454, 15.660007982, 16.709910502, 17.803296389, 18.945495772, 20.129342395, 21.366102753, 22.658353839, 24, 24, 24, 24], degree=3))
            add(Edge.make_bspline(
                [(4.063339582, 1.9515743), (4.002397965, 1.952569276), (3.883743193, 1.954506517), (3.711359118, 1.971846347), (3.549674268, 1.998386209), (3.398951853, 2.0369045), (3.259007654, 2.086353292), (3.129905498, 2.147263285), (3.012269836, 2.219998383), (2.90464369, 2.302794639), (2.808461007, 2.397160809), (2.721973345, 2.501141662), (2.646347447, 2.615673526), (2.58163302, 2.740577261), (2.526193974, 2.875177636), (2.480472858, 3.01953646), (2.446047261, 3.174342245), (2.431421007, 3.281307488), (2.423916505, 3.336189685)],
                knots=[0, 0, 0, 0, 1.217954099, 2.371385517, 3.459848295, 4.490682126, 5.476952527, 6.422732854, 7.338496285, 8.236688651, 9.131557988, 10.026443255, 10.935708282, 11.869506048, 12.834296687, 13.842423496, 14.892981177, 16, 16, 16, 16], degree=3))
        make_face()
    extrude(amount=-CUT_EXTRUDE4_DEPTH, mode=Mode.SUBTRACT)

    # Sketch7 → Cut-Extrude5 (cut)
    with BuildSketch(Plane(origin=(0, 3, 0), x_dir=(1, 0, 0), z_dir=(0, 1, 0))):
        with Locations((6.299141853, 1.589907949)):
            Rectangle(SKETCH7_W, SKETCH7_H)
    extrude(amount=-CUT_EXTRUDE5_DEPTH, mode=Mode.SUBTRACT)


solid = part.part
